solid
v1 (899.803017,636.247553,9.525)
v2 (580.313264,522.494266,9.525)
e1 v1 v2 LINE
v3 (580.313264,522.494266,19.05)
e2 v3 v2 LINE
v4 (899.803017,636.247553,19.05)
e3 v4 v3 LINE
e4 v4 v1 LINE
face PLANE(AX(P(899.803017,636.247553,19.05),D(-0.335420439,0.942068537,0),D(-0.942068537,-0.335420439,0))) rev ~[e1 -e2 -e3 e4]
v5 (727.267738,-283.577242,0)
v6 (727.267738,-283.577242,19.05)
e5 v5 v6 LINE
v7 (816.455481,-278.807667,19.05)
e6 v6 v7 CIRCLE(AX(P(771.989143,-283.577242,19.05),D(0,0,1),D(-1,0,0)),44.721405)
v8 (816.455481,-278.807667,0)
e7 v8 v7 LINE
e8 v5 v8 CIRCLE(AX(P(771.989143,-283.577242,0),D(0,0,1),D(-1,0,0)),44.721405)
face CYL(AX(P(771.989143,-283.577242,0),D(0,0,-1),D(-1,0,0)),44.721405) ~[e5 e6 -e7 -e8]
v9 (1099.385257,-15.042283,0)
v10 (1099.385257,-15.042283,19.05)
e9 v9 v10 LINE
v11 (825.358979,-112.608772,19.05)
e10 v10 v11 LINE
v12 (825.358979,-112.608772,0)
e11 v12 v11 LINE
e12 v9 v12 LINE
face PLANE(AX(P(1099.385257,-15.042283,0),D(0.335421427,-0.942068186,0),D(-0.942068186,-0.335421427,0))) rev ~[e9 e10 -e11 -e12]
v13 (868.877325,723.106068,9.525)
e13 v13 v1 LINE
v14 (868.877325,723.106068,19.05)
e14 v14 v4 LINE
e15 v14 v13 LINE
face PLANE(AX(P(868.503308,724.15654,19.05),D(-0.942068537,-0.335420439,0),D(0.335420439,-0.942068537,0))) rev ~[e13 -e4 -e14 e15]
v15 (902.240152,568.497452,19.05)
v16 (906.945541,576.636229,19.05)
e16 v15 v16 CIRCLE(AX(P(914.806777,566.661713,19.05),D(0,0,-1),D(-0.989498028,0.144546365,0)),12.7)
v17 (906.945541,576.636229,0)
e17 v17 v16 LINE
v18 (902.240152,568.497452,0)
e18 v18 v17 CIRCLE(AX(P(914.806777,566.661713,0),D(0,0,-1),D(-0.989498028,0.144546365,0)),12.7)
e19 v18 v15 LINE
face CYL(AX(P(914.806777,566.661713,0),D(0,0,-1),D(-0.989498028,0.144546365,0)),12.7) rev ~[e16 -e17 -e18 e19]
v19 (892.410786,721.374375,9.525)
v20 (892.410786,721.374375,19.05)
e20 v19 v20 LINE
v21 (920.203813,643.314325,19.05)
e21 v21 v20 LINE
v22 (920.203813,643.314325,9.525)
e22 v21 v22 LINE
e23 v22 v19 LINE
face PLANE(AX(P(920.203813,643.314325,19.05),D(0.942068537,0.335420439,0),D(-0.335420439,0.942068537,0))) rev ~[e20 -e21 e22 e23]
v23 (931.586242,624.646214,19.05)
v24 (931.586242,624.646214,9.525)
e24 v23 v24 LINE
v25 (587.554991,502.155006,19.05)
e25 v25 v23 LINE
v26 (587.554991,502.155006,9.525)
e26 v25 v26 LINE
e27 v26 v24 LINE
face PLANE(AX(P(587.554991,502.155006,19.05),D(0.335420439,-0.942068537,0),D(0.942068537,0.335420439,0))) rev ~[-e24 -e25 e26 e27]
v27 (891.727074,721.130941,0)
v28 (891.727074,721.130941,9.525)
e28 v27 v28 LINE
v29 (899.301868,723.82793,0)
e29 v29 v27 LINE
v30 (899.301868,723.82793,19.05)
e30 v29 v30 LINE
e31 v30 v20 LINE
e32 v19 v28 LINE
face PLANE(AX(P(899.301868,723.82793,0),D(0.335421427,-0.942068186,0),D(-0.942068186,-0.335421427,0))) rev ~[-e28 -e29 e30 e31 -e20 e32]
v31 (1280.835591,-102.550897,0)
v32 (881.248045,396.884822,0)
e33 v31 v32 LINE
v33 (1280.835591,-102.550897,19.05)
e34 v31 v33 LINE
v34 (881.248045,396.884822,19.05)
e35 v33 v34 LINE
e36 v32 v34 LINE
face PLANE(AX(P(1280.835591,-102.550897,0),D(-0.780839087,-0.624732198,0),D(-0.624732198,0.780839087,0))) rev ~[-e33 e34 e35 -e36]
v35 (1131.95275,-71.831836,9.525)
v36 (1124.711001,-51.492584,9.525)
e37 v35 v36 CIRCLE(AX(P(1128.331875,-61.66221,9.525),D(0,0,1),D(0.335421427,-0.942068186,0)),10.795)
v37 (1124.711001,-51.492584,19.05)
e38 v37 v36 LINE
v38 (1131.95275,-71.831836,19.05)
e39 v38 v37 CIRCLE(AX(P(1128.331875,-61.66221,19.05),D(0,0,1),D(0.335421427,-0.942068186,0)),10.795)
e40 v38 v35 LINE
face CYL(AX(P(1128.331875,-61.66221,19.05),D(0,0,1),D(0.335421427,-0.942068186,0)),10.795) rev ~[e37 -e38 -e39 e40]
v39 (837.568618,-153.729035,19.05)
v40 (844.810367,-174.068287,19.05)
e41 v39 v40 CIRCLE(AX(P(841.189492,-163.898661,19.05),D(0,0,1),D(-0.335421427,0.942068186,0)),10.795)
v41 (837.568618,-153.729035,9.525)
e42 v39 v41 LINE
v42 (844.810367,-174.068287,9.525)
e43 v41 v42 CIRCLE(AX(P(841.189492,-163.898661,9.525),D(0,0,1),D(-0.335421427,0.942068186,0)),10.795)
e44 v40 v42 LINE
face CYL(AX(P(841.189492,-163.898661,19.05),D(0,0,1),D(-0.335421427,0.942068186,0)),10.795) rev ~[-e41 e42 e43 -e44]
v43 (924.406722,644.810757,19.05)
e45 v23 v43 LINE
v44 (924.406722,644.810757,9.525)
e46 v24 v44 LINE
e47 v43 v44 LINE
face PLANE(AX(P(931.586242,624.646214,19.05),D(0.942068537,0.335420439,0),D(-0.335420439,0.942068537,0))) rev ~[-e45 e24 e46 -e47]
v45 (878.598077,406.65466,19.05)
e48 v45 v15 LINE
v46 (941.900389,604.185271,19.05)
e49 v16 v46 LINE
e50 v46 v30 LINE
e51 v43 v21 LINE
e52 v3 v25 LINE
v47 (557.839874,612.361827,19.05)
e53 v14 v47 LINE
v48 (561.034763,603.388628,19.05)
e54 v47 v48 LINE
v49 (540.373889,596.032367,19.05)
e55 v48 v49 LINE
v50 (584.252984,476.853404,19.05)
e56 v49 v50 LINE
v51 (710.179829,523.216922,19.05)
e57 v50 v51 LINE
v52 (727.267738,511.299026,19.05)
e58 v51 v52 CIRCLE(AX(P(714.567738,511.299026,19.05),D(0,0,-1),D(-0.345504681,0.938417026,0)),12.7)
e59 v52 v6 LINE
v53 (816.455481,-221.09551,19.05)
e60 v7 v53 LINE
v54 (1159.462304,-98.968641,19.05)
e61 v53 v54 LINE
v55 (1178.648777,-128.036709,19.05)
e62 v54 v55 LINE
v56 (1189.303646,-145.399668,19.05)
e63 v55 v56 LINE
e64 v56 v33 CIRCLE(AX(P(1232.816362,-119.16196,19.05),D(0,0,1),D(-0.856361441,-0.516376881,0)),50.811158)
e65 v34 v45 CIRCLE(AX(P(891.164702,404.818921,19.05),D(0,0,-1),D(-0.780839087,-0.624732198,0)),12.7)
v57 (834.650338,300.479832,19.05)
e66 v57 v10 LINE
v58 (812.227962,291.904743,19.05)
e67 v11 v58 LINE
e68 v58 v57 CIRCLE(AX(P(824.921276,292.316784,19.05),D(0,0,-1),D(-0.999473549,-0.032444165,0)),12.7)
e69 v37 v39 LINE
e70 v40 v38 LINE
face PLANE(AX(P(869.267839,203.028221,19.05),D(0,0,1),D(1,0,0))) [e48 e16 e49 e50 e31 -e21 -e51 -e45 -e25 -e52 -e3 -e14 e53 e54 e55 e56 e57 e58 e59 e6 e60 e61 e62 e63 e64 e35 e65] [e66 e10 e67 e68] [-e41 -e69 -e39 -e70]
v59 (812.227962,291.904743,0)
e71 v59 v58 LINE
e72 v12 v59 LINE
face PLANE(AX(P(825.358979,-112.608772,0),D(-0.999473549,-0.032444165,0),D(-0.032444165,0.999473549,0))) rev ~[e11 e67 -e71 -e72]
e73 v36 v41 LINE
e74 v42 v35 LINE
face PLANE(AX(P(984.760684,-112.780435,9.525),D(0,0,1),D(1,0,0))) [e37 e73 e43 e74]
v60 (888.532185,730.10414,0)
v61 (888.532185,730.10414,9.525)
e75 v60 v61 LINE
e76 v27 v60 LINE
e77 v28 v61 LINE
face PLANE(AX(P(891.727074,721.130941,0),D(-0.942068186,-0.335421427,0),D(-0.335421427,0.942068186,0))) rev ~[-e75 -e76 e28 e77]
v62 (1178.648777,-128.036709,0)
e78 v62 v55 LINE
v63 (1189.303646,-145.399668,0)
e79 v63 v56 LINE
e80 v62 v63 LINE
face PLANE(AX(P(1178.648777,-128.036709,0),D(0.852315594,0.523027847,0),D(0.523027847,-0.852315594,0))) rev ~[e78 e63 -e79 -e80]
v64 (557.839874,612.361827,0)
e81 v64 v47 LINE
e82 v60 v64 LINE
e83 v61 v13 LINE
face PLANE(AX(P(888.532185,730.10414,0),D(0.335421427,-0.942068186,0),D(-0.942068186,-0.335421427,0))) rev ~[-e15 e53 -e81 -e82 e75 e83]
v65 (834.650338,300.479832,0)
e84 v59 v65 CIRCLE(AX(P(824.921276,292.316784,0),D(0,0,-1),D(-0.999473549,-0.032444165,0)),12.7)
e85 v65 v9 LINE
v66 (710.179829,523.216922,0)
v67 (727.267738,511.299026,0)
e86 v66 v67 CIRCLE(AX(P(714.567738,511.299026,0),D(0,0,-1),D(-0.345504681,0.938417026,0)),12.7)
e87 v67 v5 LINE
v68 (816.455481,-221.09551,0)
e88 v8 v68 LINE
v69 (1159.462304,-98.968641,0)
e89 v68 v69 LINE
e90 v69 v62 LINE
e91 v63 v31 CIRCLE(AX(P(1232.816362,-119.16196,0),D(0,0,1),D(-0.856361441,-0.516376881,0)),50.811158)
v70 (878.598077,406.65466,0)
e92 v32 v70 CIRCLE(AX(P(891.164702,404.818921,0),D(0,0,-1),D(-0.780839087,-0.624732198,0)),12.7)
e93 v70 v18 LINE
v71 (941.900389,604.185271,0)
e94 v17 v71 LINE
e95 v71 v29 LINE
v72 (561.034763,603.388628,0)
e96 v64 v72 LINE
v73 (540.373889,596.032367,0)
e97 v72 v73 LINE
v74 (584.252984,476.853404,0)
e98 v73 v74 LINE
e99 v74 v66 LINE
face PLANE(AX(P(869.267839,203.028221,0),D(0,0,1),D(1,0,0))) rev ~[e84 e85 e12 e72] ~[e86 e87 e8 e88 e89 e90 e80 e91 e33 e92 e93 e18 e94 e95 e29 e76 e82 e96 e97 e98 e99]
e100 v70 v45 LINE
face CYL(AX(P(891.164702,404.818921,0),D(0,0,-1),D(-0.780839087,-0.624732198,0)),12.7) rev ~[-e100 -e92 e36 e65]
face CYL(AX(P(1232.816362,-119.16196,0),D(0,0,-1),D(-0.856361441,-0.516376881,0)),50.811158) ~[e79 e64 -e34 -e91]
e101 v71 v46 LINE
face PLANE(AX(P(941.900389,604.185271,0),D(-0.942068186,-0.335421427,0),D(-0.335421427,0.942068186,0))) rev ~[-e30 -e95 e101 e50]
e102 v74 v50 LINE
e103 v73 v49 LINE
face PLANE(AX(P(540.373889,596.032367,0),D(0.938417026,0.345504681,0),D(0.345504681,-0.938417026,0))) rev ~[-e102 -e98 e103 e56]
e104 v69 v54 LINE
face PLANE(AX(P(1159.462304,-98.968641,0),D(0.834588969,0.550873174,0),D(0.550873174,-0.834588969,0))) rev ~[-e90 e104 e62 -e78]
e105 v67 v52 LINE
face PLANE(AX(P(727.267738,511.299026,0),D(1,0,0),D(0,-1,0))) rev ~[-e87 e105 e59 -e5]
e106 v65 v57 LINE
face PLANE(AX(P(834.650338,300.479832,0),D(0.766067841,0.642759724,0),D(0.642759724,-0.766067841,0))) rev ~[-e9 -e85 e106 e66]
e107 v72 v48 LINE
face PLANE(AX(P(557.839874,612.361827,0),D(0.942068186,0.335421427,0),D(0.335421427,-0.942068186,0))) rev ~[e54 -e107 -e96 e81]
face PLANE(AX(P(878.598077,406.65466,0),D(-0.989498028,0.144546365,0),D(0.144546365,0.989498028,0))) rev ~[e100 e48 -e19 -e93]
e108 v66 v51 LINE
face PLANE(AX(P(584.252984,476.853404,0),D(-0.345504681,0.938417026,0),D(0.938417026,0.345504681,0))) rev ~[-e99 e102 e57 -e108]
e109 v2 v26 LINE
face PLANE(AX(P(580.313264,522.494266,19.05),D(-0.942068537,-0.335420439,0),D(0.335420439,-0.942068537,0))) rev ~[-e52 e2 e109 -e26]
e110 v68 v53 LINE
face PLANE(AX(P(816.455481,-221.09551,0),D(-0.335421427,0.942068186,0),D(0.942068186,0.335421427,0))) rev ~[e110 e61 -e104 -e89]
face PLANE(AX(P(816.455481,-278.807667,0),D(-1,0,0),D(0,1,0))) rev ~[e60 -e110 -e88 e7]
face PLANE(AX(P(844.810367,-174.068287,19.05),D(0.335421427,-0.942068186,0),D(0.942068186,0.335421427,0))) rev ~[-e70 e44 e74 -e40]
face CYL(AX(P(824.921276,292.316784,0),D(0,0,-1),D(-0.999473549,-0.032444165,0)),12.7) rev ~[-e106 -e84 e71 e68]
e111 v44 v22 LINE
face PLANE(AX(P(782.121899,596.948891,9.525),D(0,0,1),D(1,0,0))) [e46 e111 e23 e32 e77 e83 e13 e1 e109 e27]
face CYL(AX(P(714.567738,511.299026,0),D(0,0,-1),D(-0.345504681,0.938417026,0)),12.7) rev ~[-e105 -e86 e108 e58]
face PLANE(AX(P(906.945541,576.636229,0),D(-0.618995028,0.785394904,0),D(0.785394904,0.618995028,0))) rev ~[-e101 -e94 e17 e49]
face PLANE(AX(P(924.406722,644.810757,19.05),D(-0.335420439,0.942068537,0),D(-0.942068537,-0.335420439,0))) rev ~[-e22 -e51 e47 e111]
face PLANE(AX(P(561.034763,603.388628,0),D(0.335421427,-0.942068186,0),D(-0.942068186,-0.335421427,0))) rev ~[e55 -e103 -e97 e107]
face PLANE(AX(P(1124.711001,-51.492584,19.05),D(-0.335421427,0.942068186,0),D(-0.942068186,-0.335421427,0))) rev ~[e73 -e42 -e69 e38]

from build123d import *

# Parameters (mm, degrees)
F1_DEPTH = 19.05
F3_DEPTH = 9.525
F5_DEPTH = 9.525


# Not quite as in the source:
# - a feature names something its author has since deleted; it is built from what else it names


with BuildPart() as f1:
    # F0 (on Top) → F1 (new body)
    with BuildSketch(Plane.XY):
        with BuildLine():
            Line((727.2677384075, 427.9083177516), (727.2677384075, -283.5772421425))
            ThreePointArc((727.2677384075, -283.5772421425), (774.3773382982, -328.2348347436), (816.4554812019, -278.8076674308))
            Line((816.4554812019, -278.8076674308), (816.4554812019, -221.0955097314))
            Line((816.4554812019, -221.0955097314), (1159.4623036636, -98.9686407408))
            Line((1159.4623036636, -98.9686407408), (1178.6487772739, -128.0367093729))
            Line((1178.6487772739, -128.0367093729), (1189.3036458742, -145.3996676047))
            ThreePointArc((1189.3036458742, -145.3996676047), (1254.3589120262, -165.180351508), (1280.8355912672, -102.5508970465))
            Line((1280.8355912672, -102.5508970465), (881.2480453078, 396.8848219998))
            ThreePointArc((881.2480453078, 396.8848219998), (878.9075846932, 401.4943033077), (878.5980767553, 406.6546597539))
            Line((878.5980767553, 406.6546597539), (902.2401524871, 568.497452094))
            ThreePointArc((902.2401524871, 568.497452094), (903.8120375637, 573.0182606597), (906.9455405898, 576.6362285378))
            Line((906.9455405898, 576.6362285378), (941.9003890149, 604.1852707886))
            Line((941.9003890149, 604.1852707886), (899.3018677789, 723.8279303566))
            Line((899.3018677789, 723.8279303566), (891.7270738587, 721.1309406639))
            Line((891.7270738587, 721.1309406639), (888.532184766, 730.1041401315))
            Line((888.532184766, 730.1041401315), (557.8398737201, 612.361827435))
            Line((557.8398737201, 612.361827435), (561.0347628128, 603.3886279674))
            Line((561.0347628128, 603.3886279674), (540.3738890749, 596.0323666485))
            Line((540.3738890749, 596.0323666485), (584.2529836062, 476.853404314))
            Line((584.2529836062, 476.853404314), (710.1798289544, 523.2169221936))
            ThreePointArc((710.1798289544, 523.2169221936), (721.8328450807, 521.7157540947), (727.2677384075, 511.2990259602))
            Line((727.2677384075, 511.2990259602), (727.2677384075, 427.9083177516))
        make_face()
        with BuildLine():
            Line((1099.3852571882, -15.0422832395), (825.3589785984, -112.6087723988))
            Line((825.3589785984, -112.6087723988), (812.2279623998, 291.9047427935))
            ThreePointArc((812.2279623998, 291.9047427935), (820.3847868922, 304.1789193457), (834.6503380579, 300.4798321914))
            Line((834.6503380579, 300.4798321914), (1099.3852571882, -15.0422832395))
        make_face(mode=Mode.SUBTRACT)
    extrude(amount=F1_DEPTH)

    # F2 (on face) → F3 (cut)
    with BuildSketch(Plane.XY.offset(19.05)):
        with BuildLine():
            ThreePointArc((837.5686180204, -153.7290348884), (831.0198662622, -167.5195352567), (844.8103666306, -174.068287015))
            Line((844.8103666306, -174.068287015), (1131.9527495937, -71.8318360485))
            ThreePointArc((1131.9527495937, -71.8318360485), (1138.501501352, -58.0413356801), (1124.7110009836, -51.4925839219))
            Line((1124.7110009836, -51.4925839219), (837.5686180204, -153.7290348884))
        make_face()
    extrude(amount=-F3_DEPTH, mode=Mode.SUBTRACT)

    # F4 (on face) → F5 (cut)
    with BuildSketch(Plane.XY.offset(19.05)):
        Polygon((580.3132639661, 522.4942656533), (587.5549912453, 502.1550059319), (931.5862417023, 624.6462138439), (924.4067217173, 644.8107569177), (920.2038128035, 643.3143248671), (892.0960137021, 722.2584502232), (888.9011246094, 731.2316496908), (868.5033081007, 724.1565396792), (899.8030168616, 636.2475531691), align=None)
    extrude(amount=-F5_DEPTH, mode=Mode.SUBTRACT)


solid = f1.part
